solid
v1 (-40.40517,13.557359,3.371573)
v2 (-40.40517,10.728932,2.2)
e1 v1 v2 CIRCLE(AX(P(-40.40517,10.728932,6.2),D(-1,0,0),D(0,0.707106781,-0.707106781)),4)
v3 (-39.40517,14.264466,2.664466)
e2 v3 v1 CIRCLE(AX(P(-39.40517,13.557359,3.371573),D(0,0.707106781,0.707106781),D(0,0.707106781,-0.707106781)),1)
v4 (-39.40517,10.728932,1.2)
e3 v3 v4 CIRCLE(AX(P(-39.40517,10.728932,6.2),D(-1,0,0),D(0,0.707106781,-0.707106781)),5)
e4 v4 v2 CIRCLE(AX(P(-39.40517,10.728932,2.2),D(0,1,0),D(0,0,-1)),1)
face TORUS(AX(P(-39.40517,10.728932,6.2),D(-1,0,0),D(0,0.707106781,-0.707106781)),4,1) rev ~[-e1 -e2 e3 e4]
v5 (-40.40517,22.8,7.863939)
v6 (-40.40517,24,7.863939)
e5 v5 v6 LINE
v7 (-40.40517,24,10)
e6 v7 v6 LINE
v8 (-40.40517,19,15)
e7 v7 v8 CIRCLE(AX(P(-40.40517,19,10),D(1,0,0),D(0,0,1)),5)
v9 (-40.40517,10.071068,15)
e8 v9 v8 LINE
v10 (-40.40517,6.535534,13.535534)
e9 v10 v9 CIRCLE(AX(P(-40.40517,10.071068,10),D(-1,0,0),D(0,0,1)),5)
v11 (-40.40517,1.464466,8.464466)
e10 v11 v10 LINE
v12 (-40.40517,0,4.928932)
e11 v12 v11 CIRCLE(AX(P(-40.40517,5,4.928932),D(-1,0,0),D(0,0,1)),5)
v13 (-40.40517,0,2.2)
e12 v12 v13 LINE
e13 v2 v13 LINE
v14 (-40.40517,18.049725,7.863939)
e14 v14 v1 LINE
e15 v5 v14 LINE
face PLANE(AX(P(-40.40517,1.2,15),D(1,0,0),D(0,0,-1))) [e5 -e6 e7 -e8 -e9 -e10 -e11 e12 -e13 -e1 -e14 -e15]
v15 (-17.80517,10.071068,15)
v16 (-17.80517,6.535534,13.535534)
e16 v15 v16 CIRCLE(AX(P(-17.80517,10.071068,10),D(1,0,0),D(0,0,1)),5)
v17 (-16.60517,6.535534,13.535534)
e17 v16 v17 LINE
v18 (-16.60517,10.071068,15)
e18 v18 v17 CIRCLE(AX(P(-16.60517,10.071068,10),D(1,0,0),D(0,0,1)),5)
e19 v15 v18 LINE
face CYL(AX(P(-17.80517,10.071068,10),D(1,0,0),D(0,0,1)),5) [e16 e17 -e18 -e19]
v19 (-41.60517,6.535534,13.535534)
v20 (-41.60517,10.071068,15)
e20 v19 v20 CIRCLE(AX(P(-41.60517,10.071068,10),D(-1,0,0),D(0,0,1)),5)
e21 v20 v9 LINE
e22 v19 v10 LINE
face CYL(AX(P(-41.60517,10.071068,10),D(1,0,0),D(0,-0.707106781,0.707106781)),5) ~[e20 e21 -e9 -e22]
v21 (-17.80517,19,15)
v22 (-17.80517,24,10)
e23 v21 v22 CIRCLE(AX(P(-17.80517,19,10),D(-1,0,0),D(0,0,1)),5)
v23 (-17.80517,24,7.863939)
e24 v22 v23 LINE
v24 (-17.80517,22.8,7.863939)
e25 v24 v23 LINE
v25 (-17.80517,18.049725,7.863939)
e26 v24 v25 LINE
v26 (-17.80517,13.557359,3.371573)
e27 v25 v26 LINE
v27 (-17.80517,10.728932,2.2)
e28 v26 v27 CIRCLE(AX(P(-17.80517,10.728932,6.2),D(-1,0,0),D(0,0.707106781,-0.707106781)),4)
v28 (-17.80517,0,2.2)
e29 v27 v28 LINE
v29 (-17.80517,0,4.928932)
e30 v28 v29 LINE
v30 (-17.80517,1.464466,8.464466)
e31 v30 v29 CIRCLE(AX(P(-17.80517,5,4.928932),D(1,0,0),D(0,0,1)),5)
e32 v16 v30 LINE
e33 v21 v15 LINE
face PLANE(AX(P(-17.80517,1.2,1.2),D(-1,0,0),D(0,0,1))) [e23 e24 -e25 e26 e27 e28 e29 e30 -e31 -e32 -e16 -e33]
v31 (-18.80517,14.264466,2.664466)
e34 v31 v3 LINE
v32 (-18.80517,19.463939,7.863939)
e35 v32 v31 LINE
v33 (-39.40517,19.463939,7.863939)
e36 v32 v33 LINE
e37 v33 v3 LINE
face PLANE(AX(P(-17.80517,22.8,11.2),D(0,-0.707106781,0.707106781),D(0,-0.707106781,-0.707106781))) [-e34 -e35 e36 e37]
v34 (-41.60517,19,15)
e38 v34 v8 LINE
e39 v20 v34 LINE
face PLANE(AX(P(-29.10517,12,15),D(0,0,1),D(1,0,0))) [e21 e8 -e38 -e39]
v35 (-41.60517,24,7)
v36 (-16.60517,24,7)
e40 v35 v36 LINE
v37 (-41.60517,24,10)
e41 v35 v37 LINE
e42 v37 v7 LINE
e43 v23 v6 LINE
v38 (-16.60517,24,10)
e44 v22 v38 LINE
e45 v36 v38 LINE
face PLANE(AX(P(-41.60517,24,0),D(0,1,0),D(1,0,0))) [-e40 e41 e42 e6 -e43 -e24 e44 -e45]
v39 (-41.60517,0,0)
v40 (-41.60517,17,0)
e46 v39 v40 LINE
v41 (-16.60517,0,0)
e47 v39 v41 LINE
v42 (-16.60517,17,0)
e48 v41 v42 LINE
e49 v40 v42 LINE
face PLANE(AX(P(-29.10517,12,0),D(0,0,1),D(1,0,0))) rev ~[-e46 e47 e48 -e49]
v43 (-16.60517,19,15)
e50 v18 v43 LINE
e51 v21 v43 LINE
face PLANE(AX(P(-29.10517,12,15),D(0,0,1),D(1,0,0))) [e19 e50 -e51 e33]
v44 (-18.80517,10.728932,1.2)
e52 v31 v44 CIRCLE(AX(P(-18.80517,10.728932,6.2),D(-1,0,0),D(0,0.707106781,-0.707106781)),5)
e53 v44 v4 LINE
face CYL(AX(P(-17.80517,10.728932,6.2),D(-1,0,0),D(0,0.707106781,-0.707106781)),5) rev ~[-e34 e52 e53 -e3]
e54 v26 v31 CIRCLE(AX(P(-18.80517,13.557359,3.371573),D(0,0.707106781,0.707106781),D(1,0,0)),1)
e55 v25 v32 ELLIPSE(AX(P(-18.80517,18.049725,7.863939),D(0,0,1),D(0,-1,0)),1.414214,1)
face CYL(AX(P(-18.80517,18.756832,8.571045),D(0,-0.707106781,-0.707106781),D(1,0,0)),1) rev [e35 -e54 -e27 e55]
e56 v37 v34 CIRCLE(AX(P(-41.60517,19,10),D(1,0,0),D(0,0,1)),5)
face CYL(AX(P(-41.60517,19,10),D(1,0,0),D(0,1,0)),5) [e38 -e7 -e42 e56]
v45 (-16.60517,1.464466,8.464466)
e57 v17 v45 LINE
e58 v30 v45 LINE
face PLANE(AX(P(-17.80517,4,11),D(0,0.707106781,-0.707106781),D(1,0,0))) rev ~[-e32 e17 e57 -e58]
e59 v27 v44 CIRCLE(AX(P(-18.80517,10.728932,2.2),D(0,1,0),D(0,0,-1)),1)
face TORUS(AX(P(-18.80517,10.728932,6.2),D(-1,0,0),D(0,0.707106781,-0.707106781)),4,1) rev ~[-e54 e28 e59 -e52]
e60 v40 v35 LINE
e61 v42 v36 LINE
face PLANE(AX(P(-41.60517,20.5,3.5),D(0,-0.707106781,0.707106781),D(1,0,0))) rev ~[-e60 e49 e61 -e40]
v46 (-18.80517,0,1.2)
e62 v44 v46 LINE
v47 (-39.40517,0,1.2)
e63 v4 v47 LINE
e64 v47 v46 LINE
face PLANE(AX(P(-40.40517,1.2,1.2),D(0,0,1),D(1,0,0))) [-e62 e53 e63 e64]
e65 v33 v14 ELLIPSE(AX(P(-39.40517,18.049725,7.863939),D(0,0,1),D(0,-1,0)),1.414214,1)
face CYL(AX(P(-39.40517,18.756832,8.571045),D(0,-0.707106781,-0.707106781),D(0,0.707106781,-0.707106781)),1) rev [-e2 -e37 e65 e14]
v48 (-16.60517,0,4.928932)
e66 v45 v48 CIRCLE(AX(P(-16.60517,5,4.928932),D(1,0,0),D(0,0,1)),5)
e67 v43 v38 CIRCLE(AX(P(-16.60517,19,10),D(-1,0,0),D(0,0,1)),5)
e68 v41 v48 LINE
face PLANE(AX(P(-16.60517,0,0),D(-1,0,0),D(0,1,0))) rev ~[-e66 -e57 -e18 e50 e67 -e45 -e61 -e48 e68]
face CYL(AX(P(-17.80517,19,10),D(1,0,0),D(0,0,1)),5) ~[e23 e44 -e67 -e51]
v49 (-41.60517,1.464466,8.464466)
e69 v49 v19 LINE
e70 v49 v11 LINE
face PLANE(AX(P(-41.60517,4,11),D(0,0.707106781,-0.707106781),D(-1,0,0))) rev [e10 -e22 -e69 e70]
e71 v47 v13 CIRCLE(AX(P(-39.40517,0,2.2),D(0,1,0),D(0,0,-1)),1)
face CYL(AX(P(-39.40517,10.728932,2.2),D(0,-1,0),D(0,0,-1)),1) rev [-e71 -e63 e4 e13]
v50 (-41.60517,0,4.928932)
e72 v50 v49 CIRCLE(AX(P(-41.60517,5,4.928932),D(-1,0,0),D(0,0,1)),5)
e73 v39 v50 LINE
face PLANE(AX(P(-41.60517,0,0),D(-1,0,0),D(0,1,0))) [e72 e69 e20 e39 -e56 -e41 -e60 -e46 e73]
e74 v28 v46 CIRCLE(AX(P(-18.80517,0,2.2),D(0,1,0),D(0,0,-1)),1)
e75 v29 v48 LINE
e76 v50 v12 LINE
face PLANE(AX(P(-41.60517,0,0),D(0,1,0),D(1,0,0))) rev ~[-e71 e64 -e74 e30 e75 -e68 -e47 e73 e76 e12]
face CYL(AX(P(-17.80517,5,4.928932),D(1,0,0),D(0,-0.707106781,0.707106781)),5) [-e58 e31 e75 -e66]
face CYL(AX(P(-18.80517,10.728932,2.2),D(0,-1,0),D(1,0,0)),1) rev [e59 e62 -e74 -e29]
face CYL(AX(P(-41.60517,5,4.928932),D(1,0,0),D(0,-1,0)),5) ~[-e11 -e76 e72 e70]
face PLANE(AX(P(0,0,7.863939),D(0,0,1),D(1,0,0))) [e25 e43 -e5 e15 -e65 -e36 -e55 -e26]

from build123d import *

# Parameters (mm, degrees)
F0_W        = 25
F0_H        = 24
F1_DEPTH    = 15
F2_T        = -1.2
F3_DEPTH    = 25
F4_W        = 22.6
F4_H        = 7.1360613033
F5_DEPTH    = 25
F6_T4_DEPTH = 22.6
F7_R        = 5
F8_SIZE     = 8
F9_R        = 5
F10_R       = 1
F11_SIZE    = 7


# Not quite as in the source:
# - a fillet or chamfer that OpenCascade refuses, or shapes differently, is made with other operations: its cross-section is extruded or revolved along the edge and cut away or added


with BuildPart() as f1:
    # F0 (on Top) → F1 (new body)
    with BuildSketch(Plane.XY):
        with Locations((-29.1051699208, 12)):
            Rectangle(F0_W, F0_H)
    extrude(amount=F1_DEPTH)

    # F2
    f2_openings = [f1.faces().sort_by_distance(p)[0] for p in [
        (-29.10517, 12, 15),
    ]]
    offset(amount=F2_T, openings=f2_openings)

    # F3 (cut): a face of the model
    f3_faces = [f1.faces().sort_by_distance(p)[0] for p in [
        (-29.1051699208, 1.2, 8.1),
    ]]
    extrude(f3_faces, amount=-F3_DEPTH, mode=Mode.SUBTRACT)

    # F4 (on face) → F5 (cut)
    with BuildSketch(Plane.XZ.offset(-22.8)):
        with Locations((-29.1051699208, 11.4319693483)):
            Rectangle(F4_W, F4_H)
    extrude(amount=-F5_DEPTH, mode=Mode.SUBTRACT)

    # F6: chamfer of 10 on 1 edges, made by hand


with BuildPart() as f6_tool2:
    # F6_s3 → F6_t4 (new body)
    with BuildSketch(Plane.YZ.offset(-17.8051699208)):
        Polygon((22.8, 11.2), (12.8, 1.2), (22.8, 1.2), align=None)
    extrude(amount=-F6_T4_DEPTH)

    split(bisect_by=Plane.XY.offset(7.8639386967), keep=Keep.BOTTOM)


with BuildPart() as f1_1:
    add(f1.part)

    # F6_t1: union F6_tool2
    add(f6_tool2.part)

    # F7
    f7_edges = [f1_1.edges().sort_by_distance(p)[0] for p in [
        (-29.10517, 12.8, 1.2),
        (-17.20517, 24, 15),
        (-41.00517, 24, 15),
    ]]
    fillet(f7_edges, radius=F7_R)

    # F8
    f8_edges = [f1_1.edges().sort_by_distance(p)[0] for p in [
        (-41.00517, 0, 15),
        (-17.20517, 0, 15),
    ]]
    chamfer(f8_edges, length=F8_SIZE)

    # F9
    f9_edges = [f1_1.edges().sort_by_distance(p)[0] for p in [
        (-41.00517, 8, 15),
        (-41.00517, 0, 7),
        (-17.20517, 0, 7),
        (-17.20517, 8, 15),
    ]]
    fillet(f9_edges, radius=F9_R)

    # F10
    f10_edges = [f1_1.edges().sort_by_distance(p)[0] for p in [
        (-40.40517, 5.364466, 1.2),
        (-17.80517, 5.364466, 1.2),
        (-17.80517, 12.642349, 1.580602),
        (-17.80517, 16.864202, 5.264202),
        (-40.40517, 16.864202, 5.264202),
        (-40.40517, 12.642349, 1.580602),
    ]]
    fillet(f10_edges, radius=F10_R)

    # F11
    f11_edges = [f1_1.edges().sort_by_distance(p)[0] for p in [
        (-29.10517, 24, 0),
    ]]
    chamfer(f11_edges, length=F11_SIZE)


solid = f1_1.part
